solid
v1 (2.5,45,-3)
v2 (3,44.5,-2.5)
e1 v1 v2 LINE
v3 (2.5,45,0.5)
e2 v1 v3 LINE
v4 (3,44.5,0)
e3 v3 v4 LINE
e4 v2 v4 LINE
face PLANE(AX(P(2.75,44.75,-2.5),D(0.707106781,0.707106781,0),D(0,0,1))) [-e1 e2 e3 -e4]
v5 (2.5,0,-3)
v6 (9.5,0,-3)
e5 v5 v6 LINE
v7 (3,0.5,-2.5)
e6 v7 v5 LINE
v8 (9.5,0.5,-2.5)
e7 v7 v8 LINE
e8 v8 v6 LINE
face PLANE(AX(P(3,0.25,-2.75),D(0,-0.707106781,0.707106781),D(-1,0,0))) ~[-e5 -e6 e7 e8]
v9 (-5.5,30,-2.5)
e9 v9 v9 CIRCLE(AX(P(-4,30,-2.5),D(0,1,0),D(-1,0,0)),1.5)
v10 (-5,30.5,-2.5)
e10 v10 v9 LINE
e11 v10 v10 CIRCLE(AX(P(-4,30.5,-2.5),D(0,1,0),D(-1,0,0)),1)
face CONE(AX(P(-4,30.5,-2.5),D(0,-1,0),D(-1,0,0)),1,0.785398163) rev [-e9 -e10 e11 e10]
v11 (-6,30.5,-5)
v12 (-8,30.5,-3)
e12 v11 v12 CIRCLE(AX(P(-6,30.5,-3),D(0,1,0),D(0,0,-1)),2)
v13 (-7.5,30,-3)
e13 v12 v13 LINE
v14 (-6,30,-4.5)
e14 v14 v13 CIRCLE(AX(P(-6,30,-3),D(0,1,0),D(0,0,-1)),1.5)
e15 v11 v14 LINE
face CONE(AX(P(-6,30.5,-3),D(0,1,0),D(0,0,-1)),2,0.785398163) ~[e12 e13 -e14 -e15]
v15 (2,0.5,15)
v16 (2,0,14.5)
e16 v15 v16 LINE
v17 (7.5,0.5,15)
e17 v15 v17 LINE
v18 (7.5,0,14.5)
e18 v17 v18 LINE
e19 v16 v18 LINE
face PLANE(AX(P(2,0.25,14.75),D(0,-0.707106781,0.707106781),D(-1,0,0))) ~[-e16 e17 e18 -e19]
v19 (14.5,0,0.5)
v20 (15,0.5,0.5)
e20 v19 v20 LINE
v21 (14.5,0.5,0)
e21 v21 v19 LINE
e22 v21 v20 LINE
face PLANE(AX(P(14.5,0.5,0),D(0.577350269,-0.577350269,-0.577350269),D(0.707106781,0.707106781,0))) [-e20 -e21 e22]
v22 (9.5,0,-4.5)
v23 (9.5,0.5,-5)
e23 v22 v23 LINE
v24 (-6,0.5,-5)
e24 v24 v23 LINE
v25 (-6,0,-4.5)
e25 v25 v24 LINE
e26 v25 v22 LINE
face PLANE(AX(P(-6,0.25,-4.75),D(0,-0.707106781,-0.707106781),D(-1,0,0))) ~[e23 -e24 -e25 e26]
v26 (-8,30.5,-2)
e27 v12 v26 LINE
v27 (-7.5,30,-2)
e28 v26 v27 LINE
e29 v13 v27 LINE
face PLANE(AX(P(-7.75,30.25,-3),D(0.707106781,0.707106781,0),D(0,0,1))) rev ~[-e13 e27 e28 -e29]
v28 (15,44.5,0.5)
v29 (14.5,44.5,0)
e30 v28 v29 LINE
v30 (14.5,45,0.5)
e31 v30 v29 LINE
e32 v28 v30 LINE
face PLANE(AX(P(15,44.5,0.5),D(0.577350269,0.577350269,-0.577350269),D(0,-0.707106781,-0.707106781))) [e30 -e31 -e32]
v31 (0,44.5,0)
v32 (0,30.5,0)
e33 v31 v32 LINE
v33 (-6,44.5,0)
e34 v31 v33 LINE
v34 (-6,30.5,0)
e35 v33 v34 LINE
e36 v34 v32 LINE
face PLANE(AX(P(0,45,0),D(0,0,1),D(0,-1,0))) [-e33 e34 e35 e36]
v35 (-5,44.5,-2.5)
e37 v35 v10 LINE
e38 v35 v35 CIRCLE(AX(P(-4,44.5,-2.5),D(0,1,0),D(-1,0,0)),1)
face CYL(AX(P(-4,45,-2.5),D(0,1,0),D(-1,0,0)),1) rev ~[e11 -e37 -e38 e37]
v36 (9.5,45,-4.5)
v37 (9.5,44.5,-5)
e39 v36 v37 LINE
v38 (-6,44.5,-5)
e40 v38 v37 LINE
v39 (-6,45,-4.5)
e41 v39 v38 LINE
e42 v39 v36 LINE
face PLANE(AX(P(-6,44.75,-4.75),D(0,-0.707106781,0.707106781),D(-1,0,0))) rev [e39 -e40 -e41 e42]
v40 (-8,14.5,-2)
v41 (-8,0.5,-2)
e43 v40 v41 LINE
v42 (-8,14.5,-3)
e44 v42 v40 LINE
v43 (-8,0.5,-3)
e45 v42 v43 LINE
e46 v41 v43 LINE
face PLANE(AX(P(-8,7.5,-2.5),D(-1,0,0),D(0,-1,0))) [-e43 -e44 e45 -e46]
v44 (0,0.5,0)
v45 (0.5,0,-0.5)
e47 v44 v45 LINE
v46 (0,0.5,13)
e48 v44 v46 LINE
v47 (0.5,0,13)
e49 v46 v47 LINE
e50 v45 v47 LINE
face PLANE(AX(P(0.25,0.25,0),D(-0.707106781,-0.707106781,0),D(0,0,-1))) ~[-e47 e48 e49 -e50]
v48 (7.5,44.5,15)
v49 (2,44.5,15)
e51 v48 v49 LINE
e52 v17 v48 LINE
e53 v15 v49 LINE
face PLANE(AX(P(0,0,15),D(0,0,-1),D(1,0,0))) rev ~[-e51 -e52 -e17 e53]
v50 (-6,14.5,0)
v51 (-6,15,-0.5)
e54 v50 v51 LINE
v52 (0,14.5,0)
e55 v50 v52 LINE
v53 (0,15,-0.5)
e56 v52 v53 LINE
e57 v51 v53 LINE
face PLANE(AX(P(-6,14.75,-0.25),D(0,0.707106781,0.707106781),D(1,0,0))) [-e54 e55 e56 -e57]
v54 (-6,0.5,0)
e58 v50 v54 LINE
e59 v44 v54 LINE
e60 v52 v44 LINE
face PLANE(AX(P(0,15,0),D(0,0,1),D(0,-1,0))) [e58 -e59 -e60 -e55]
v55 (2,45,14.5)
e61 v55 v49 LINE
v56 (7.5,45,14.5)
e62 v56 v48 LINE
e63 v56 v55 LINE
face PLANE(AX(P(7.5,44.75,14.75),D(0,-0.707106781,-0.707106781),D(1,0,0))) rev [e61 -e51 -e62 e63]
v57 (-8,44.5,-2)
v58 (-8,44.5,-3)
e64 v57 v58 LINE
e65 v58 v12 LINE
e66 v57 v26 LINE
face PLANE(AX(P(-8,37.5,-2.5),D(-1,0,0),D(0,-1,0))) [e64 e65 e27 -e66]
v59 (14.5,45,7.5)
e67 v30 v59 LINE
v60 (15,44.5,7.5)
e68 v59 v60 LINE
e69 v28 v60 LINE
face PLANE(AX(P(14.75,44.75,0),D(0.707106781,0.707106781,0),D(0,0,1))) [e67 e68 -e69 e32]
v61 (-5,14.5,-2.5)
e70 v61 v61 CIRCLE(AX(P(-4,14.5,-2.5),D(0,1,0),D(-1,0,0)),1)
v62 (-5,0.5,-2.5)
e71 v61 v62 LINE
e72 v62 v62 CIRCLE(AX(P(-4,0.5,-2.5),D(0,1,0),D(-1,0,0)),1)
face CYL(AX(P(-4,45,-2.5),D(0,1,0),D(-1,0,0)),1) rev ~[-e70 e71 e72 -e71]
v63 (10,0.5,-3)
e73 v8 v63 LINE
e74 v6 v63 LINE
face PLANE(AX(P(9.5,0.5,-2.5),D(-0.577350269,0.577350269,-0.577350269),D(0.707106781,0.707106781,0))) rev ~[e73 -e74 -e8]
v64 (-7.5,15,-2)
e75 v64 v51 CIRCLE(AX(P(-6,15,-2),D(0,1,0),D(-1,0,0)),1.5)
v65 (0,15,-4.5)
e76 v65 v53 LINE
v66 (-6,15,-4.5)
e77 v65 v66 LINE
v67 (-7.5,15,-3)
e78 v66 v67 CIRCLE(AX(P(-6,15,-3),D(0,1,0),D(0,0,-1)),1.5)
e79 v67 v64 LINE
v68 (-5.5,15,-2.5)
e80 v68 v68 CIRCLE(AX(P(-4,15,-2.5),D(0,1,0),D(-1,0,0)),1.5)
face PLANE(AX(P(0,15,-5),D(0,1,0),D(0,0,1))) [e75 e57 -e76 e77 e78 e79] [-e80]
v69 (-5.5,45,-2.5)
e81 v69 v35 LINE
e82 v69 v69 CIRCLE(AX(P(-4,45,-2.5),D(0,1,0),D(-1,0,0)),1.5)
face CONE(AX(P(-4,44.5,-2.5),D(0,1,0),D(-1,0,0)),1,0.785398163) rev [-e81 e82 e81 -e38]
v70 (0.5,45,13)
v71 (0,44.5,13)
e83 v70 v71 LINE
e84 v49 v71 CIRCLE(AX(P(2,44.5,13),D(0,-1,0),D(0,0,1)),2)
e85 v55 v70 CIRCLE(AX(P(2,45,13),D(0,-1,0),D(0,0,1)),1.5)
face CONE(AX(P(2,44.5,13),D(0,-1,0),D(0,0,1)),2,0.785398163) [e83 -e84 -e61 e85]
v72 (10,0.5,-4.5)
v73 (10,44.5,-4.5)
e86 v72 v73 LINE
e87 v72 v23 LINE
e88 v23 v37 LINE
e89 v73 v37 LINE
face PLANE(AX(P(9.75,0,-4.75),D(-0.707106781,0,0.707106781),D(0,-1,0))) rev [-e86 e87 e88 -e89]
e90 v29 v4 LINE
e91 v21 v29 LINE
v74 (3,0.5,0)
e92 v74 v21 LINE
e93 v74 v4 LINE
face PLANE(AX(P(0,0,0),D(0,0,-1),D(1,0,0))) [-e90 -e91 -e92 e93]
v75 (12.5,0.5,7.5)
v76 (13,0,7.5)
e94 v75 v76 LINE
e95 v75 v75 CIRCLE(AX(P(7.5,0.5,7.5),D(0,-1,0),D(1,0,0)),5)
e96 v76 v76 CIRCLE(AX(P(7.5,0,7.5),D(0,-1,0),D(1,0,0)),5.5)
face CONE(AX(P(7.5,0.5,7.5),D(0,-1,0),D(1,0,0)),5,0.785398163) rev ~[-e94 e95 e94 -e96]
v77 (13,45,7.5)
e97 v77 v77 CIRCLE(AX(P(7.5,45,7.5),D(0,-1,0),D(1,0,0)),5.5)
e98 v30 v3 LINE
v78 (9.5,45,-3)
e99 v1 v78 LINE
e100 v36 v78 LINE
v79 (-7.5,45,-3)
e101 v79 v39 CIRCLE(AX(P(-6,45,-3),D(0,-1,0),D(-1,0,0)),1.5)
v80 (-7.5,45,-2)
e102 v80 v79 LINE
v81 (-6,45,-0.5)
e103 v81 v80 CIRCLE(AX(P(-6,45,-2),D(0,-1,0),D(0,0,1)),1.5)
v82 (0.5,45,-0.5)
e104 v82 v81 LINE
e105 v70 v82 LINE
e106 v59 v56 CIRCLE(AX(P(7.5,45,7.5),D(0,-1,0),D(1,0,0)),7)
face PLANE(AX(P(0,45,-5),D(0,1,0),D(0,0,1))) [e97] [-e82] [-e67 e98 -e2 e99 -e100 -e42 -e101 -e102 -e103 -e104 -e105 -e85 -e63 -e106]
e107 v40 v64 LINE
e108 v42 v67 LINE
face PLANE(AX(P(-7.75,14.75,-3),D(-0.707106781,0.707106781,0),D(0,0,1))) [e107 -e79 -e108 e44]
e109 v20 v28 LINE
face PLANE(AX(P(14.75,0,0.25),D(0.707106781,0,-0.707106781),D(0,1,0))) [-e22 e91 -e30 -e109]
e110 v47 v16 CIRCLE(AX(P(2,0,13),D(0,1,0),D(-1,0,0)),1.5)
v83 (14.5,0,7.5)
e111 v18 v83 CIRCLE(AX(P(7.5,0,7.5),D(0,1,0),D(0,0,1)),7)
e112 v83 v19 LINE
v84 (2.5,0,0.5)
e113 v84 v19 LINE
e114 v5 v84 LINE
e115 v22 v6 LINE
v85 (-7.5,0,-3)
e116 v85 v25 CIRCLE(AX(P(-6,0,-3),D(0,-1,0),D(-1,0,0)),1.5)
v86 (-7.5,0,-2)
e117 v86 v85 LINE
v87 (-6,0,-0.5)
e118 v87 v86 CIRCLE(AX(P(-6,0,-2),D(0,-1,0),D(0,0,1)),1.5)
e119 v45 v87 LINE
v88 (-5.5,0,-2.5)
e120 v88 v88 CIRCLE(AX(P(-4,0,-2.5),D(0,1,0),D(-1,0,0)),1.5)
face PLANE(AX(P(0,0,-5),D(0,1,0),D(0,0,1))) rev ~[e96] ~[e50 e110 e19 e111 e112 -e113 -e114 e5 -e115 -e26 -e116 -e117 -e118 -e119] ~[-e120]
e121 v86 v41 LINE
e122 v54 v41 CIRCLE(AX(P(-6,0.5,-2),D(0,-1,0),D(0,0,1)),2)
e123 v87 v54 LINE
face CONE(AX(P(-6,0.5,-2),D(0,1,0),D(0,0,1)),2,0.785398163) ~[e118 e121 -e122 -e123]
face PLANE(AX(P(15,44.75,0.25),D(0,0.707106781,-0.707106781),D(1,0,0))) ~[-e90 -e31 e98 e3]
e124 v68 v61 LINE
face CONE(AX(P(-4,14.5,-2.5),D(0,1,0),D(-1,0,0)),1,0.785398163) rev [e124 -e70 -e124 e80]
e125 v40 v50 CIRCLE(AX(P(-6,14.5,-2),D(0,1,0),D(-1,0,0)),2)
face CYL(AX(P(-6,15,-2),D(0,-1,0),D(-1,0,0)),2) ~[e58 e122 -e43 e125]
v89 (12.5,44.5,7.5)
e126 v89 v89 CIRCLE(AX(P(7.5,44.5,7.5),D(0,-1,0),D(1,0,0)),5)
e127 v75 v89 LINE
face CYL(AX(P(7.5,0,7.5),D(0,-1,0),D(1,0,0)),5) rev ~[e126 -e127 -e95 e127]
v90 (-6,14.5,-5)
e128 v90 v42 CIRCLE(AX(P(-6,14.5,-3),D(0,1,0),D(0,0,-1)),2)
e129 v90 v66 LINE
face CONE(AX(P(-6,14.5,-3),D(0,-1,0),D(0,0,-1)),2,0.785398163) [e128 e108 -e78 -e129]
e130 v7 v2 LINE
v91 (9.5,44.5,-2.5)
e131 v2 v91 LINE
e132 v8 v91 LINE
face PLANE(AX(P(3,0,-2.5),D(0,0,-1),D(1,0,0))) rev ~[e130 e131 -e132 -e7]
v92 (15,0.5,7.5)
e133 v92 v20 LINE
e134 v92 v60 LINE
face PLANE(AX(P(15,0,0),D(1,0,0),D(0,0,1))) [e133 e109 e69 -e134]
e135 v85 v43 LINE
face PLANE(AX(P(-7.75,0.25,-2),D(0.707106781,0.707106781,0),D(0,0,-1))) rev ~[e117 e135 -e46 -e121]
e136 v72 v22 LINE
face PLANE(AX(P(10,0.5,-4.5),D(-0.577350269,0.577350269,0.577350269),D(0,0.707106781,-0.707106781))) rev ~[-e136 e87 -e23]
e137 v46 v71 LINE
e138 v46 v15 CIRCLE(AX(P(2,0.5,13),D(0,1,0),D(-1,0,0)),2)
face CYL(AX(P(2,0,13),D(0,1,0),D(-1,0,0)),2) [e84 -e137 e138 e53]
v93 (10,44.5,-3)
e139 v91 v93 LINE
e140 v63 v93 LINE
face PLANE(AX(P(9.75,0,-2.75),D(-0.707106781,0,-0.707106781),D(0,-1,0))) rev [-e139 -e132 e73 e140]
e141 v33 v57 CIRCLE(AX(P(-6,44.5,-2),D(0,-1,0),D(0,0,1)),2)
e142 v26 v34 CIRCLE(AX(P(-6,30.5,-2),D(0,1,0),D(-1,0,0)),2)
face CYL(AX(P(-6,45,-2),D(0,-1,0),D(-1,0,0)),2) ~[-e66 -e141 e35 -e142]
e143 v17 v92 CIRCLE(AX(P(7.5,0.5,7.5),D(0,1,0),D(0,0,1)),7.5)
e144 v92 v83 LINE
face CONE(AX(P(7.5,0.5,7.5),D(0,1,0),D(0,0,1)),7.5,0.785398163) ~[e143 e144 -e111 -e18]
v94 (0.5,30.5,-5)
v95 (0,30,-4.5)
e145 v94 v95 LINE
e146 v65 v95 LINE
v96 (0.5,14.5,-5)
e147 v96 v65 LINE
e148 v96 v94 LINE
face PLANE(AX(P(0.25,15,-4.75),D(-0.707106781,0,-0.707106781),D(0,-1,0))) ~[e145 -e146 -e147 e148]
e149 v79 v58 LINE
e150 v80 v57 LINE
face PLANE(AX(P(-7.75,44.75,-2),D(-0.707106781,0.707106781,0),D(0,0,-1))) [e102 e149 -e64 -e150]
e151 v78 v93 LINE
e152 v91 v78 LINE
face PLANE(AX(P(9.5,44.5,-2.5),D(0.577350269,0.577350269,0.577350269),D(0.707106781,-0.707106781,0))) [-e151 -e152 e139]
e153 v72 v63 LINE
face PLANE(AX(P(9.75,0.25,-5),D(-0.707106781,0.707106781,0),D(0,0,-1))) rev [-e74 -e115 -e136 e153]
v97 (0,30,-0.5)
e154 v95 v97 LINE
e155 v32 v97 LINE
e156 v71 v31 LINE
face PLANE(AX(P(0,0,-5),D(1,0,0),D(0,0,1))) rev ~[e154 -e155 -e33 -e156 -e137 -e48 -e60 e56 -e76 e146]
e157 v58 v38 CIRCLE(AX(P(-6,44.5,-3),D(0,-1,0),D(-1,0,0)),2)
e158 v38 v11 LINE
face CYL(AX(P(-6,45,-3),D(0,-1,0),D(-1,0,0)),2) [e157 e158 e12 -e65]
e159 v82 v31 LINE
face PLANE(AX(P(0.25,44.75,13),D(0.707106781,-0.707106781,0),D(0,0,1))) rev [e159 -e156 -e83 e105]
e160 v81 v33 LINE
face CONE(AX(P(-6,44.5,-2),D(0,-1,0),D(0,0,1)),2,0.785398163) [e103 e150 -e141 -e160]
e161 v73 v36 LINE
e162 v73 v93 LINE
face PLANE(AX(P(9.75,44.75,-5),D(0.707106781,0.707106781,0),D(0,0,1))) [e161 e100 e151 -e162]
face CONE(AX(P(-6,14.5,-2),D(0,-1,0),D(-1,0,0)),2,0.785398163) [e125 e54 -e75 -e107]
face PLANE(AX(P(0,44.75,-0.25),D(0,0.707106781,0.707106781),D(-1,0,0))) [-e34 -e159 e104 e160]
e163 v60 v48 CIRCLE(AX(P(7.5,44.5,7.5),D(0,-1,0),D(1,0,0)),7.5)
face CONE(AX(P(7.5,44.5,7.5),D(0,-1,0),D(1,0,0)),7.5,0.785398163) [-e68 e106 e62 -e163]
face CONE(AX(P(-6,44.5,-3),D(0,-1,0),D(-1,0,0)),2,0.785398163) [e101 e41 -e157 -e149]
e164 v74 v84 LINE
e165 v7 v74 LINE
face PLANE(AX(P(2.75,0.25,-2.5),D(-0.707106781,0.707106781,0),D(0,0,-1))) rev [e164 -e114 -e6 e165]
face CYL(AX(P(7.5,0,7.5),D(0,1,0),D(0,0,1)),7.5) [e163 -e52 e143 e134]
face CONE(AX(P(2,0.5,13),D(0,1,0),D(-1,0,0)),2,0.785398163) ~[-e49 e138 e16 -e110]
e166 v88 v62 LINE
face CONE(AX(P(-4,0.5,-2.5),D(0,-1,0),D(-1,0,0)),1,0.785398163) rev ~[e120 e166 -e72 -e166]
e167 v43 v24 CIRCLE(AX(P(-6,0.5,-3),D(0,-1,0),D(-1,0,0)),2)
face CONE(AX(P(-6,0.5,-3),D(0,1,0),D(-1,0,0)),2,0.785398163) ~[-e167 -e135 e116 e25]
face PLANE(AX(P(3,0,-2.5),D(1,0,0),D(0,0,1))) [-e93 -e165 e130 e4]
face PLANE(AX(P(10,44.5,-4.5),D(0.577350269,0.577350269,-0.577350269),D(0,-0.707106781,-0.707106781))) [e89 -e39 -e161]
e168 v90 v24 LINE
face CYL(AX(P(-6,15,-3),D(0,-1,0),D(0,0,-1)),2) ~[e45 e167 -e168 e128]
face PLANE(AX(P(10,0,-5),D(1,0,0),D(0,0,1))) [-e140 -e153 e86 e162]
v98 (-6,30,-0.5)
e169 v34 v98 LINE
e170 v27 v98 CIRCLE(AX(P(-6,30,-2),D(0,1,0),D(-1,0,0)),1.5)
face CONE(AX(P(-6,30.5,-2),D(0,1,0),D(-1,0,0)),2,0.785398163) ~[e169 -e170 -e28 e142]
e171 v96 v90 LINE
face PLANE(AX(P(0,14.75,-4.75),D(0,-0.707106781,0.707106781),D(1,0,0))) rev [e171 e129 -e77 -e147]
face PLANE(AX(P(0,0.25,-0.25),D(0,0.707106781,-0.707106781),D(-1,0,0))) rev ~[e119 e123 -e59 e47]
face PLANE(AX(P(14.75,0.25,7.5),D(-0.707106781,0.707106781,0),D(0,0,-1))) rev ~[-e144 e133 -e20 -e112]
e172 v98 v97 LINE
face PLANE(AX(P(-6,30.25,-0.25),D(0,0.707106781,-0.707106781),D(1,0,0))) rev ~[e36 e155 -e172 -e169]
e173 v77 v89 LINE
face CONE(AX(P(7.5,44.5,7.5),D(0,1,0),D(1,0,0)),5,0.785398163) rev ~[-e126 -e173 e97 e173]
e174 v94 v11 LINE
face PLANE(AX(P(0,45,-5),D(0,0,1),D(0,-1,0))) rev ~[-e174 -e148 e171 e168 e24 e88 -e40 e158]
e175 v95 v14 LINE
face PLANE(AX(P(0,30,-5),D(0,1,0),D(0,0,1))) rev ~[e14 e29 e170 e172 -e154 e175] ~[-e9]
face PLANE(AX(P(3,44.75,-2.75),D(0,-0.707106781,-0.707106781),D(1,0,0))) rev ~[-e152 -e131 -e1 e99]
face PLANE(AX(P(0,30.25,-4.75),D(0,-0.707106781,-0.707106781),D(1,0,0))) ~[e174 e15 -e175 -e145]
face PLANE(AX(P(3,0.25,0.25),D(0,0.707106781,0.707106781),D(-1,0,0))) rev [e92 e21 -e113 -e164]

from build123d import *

# Parameters (mm, degrees)
F0_W      = 15
F0_H      = 15
F1_DEPTH  = 45
F2_R      = 5
F3_DEPTH  = 45
F4_R      = 7.5
F6_W      = 10
F6_H      = 5
F7_DEPTH  = 45
F8_W      = 7
F8_H      = 2.5
F9_DEPTH  = 45
F10_W     = 15
F10_H     = 5
F11_DEPTH = 8
F12_W     = 15
F12_H     = 5
F13_DEPTH = 8
F14_R     = 1
F15_DEPTH = 45
F16_R     = 2
F17_SIZE  = 0.5


with BuildPart() as f1:
    # F0 (on Front) → F1 (new body)
    with BuildSketch(Plane.XZ):
        with Locations((7.5, 7.5)):
            Rectangle(F0_W, F0_H)
    extrude(amount=-F1_DEPTH)

    # F2 (on face) → F3 (cut)
    with BuildSketch(Plane.XZ):
        with Locations((7.5, 7.5)):
            Circle(F2_R)
    extrude(amount=-F3_DEPTH, mode=Mode.SUBTRACT)

    # F4
    f4_edges = [f1.edges().sort_by_distance(p)[0] for p in [
        (15, 22.5, 15),
    ]]
    fillet(f4_edges, radius=F4_R)

    # F6 (on face) → F7 (join)
    with BuildSketch(Plane.XZ):
        with Locations((5, -2.5)):
            Rectangle(F6_W, F6_H)
    extrude(amount=-F7_DEPTH)

    # F8 (on face) → F9 (cut)
    with BuildSketch(Plane.XZ):
        with Locations((6.5, -1.25)):
            Rectangle(F8_W, F8_H)
    extrude(amount=-F9_DEPTH, mode=Mode.SUBTRACT)

    # F10 (on face) → F11 (join)
    with BuildSketch(Plane(origin=(0, 0, 0), x_dir=(0, -1, 0), z_dir=(-1, 0, 0))):
        with Locations((-7.5, -2.5)):
            Rectangle(F10_W, F10_H)
    extrude(amount=F11_DEPTH)

    # F12 (on face) → F13 (join)
    with BuildSketch(Plane(origin=(0, 0, 0), x_dir=(0, -1, 0), z_dir=(-1, 0, 0))):
        with Locations((-37.5, -2.5)):
            Rectangle(F12_W, F12_H)
    extrude(amount=F13_DEPTH)

    # F14 (on face) → F15 (cut)
    with BuildSketch(Plane(origin=(0, 45, 0), x_dir=(-1, 0, 0), z_dir=(0, 1, 0))):
        with Locations((4, -2.5)):
            Circle(F14_R)
    extrude(amount=-F15_DEPTH, mode=Mode.SUBTRACT)

    # F16
    f16_edges = [f1.edges().sort_by_distance(p)[0] for p in [
        (-8, 37.5, 0),
        (-8, 37.5, -5),
        (-8, 7.5, -5),
        (-8, 7.5, 0),
        (0, 22.5, 15),
    ]]
    fillet(f16_edges, radius=F16_R)

    # F17
    f17_edges = [f1.edges().sort_by_distance(p)[0] for p in [
        (0, 0, 6.5),
        (-3, 0, 0),
        (10, 0, -3.75),
        (6.5, 0, -2.5),
        (3, 0, -1.25),
        (9, 0, 0),
        (2.5, 0, 7.5),
        (-3, 15, -5),
        (-3, 15, -2.5),
        (-3, 0, -2.5),
        (-3, 30, -2.5),
        (2, 0, -5),
        (-7.414214, 45, -4.414214),
        (10, 45, -3.75),
        (6.5, 45, -2.5),
        (3, 45, -1.25),
        (9, 45, 0),
        (2.5, 45, 7.5),
        (15, 45, 3.75),
        (-3, 45, -2.5),
        (15, 22.5, 0),
        (10, 22.5, -5),
        (10, 22.5, -2.5),
        (0, 22.5, -5),
        (4.75, 0, 15),
        (4.75, 45, 15),
        (0.585786, 0, 14.414214),
        (12.803301, 0, 12.803301),
        (15, 0, 3.75),
        (-7.414214, 0, -0.585786),
        (-8, 0, -2.5),
        (-7.414214, 0, -4.414214),
        (0.585786, 45, 14.414214),
        (12.803301, 45, 12.803301),
        (0, 45, 6.5),
        (-3, 45, 0),
        (-7.414214, 45, -0.585786),
        (-8, 45, -2.5),
        (2, 45, -5),
        (-3, 15, 0),
        (-7.414214, 15, -0.585786),
        (-8, 15, -2.5),
        (-7.414214, 15, -4.414214),
        (-3, 30, -5),
        (-3, 30, 0),
        (-7.414214, 30, -0.585786),
        (-8, 30, -2.5),
        (-7.414214, 30, -4.414214),
    ]]
    chamfer(f17_edges, length=F17_SIZE)


solid = f1.part
